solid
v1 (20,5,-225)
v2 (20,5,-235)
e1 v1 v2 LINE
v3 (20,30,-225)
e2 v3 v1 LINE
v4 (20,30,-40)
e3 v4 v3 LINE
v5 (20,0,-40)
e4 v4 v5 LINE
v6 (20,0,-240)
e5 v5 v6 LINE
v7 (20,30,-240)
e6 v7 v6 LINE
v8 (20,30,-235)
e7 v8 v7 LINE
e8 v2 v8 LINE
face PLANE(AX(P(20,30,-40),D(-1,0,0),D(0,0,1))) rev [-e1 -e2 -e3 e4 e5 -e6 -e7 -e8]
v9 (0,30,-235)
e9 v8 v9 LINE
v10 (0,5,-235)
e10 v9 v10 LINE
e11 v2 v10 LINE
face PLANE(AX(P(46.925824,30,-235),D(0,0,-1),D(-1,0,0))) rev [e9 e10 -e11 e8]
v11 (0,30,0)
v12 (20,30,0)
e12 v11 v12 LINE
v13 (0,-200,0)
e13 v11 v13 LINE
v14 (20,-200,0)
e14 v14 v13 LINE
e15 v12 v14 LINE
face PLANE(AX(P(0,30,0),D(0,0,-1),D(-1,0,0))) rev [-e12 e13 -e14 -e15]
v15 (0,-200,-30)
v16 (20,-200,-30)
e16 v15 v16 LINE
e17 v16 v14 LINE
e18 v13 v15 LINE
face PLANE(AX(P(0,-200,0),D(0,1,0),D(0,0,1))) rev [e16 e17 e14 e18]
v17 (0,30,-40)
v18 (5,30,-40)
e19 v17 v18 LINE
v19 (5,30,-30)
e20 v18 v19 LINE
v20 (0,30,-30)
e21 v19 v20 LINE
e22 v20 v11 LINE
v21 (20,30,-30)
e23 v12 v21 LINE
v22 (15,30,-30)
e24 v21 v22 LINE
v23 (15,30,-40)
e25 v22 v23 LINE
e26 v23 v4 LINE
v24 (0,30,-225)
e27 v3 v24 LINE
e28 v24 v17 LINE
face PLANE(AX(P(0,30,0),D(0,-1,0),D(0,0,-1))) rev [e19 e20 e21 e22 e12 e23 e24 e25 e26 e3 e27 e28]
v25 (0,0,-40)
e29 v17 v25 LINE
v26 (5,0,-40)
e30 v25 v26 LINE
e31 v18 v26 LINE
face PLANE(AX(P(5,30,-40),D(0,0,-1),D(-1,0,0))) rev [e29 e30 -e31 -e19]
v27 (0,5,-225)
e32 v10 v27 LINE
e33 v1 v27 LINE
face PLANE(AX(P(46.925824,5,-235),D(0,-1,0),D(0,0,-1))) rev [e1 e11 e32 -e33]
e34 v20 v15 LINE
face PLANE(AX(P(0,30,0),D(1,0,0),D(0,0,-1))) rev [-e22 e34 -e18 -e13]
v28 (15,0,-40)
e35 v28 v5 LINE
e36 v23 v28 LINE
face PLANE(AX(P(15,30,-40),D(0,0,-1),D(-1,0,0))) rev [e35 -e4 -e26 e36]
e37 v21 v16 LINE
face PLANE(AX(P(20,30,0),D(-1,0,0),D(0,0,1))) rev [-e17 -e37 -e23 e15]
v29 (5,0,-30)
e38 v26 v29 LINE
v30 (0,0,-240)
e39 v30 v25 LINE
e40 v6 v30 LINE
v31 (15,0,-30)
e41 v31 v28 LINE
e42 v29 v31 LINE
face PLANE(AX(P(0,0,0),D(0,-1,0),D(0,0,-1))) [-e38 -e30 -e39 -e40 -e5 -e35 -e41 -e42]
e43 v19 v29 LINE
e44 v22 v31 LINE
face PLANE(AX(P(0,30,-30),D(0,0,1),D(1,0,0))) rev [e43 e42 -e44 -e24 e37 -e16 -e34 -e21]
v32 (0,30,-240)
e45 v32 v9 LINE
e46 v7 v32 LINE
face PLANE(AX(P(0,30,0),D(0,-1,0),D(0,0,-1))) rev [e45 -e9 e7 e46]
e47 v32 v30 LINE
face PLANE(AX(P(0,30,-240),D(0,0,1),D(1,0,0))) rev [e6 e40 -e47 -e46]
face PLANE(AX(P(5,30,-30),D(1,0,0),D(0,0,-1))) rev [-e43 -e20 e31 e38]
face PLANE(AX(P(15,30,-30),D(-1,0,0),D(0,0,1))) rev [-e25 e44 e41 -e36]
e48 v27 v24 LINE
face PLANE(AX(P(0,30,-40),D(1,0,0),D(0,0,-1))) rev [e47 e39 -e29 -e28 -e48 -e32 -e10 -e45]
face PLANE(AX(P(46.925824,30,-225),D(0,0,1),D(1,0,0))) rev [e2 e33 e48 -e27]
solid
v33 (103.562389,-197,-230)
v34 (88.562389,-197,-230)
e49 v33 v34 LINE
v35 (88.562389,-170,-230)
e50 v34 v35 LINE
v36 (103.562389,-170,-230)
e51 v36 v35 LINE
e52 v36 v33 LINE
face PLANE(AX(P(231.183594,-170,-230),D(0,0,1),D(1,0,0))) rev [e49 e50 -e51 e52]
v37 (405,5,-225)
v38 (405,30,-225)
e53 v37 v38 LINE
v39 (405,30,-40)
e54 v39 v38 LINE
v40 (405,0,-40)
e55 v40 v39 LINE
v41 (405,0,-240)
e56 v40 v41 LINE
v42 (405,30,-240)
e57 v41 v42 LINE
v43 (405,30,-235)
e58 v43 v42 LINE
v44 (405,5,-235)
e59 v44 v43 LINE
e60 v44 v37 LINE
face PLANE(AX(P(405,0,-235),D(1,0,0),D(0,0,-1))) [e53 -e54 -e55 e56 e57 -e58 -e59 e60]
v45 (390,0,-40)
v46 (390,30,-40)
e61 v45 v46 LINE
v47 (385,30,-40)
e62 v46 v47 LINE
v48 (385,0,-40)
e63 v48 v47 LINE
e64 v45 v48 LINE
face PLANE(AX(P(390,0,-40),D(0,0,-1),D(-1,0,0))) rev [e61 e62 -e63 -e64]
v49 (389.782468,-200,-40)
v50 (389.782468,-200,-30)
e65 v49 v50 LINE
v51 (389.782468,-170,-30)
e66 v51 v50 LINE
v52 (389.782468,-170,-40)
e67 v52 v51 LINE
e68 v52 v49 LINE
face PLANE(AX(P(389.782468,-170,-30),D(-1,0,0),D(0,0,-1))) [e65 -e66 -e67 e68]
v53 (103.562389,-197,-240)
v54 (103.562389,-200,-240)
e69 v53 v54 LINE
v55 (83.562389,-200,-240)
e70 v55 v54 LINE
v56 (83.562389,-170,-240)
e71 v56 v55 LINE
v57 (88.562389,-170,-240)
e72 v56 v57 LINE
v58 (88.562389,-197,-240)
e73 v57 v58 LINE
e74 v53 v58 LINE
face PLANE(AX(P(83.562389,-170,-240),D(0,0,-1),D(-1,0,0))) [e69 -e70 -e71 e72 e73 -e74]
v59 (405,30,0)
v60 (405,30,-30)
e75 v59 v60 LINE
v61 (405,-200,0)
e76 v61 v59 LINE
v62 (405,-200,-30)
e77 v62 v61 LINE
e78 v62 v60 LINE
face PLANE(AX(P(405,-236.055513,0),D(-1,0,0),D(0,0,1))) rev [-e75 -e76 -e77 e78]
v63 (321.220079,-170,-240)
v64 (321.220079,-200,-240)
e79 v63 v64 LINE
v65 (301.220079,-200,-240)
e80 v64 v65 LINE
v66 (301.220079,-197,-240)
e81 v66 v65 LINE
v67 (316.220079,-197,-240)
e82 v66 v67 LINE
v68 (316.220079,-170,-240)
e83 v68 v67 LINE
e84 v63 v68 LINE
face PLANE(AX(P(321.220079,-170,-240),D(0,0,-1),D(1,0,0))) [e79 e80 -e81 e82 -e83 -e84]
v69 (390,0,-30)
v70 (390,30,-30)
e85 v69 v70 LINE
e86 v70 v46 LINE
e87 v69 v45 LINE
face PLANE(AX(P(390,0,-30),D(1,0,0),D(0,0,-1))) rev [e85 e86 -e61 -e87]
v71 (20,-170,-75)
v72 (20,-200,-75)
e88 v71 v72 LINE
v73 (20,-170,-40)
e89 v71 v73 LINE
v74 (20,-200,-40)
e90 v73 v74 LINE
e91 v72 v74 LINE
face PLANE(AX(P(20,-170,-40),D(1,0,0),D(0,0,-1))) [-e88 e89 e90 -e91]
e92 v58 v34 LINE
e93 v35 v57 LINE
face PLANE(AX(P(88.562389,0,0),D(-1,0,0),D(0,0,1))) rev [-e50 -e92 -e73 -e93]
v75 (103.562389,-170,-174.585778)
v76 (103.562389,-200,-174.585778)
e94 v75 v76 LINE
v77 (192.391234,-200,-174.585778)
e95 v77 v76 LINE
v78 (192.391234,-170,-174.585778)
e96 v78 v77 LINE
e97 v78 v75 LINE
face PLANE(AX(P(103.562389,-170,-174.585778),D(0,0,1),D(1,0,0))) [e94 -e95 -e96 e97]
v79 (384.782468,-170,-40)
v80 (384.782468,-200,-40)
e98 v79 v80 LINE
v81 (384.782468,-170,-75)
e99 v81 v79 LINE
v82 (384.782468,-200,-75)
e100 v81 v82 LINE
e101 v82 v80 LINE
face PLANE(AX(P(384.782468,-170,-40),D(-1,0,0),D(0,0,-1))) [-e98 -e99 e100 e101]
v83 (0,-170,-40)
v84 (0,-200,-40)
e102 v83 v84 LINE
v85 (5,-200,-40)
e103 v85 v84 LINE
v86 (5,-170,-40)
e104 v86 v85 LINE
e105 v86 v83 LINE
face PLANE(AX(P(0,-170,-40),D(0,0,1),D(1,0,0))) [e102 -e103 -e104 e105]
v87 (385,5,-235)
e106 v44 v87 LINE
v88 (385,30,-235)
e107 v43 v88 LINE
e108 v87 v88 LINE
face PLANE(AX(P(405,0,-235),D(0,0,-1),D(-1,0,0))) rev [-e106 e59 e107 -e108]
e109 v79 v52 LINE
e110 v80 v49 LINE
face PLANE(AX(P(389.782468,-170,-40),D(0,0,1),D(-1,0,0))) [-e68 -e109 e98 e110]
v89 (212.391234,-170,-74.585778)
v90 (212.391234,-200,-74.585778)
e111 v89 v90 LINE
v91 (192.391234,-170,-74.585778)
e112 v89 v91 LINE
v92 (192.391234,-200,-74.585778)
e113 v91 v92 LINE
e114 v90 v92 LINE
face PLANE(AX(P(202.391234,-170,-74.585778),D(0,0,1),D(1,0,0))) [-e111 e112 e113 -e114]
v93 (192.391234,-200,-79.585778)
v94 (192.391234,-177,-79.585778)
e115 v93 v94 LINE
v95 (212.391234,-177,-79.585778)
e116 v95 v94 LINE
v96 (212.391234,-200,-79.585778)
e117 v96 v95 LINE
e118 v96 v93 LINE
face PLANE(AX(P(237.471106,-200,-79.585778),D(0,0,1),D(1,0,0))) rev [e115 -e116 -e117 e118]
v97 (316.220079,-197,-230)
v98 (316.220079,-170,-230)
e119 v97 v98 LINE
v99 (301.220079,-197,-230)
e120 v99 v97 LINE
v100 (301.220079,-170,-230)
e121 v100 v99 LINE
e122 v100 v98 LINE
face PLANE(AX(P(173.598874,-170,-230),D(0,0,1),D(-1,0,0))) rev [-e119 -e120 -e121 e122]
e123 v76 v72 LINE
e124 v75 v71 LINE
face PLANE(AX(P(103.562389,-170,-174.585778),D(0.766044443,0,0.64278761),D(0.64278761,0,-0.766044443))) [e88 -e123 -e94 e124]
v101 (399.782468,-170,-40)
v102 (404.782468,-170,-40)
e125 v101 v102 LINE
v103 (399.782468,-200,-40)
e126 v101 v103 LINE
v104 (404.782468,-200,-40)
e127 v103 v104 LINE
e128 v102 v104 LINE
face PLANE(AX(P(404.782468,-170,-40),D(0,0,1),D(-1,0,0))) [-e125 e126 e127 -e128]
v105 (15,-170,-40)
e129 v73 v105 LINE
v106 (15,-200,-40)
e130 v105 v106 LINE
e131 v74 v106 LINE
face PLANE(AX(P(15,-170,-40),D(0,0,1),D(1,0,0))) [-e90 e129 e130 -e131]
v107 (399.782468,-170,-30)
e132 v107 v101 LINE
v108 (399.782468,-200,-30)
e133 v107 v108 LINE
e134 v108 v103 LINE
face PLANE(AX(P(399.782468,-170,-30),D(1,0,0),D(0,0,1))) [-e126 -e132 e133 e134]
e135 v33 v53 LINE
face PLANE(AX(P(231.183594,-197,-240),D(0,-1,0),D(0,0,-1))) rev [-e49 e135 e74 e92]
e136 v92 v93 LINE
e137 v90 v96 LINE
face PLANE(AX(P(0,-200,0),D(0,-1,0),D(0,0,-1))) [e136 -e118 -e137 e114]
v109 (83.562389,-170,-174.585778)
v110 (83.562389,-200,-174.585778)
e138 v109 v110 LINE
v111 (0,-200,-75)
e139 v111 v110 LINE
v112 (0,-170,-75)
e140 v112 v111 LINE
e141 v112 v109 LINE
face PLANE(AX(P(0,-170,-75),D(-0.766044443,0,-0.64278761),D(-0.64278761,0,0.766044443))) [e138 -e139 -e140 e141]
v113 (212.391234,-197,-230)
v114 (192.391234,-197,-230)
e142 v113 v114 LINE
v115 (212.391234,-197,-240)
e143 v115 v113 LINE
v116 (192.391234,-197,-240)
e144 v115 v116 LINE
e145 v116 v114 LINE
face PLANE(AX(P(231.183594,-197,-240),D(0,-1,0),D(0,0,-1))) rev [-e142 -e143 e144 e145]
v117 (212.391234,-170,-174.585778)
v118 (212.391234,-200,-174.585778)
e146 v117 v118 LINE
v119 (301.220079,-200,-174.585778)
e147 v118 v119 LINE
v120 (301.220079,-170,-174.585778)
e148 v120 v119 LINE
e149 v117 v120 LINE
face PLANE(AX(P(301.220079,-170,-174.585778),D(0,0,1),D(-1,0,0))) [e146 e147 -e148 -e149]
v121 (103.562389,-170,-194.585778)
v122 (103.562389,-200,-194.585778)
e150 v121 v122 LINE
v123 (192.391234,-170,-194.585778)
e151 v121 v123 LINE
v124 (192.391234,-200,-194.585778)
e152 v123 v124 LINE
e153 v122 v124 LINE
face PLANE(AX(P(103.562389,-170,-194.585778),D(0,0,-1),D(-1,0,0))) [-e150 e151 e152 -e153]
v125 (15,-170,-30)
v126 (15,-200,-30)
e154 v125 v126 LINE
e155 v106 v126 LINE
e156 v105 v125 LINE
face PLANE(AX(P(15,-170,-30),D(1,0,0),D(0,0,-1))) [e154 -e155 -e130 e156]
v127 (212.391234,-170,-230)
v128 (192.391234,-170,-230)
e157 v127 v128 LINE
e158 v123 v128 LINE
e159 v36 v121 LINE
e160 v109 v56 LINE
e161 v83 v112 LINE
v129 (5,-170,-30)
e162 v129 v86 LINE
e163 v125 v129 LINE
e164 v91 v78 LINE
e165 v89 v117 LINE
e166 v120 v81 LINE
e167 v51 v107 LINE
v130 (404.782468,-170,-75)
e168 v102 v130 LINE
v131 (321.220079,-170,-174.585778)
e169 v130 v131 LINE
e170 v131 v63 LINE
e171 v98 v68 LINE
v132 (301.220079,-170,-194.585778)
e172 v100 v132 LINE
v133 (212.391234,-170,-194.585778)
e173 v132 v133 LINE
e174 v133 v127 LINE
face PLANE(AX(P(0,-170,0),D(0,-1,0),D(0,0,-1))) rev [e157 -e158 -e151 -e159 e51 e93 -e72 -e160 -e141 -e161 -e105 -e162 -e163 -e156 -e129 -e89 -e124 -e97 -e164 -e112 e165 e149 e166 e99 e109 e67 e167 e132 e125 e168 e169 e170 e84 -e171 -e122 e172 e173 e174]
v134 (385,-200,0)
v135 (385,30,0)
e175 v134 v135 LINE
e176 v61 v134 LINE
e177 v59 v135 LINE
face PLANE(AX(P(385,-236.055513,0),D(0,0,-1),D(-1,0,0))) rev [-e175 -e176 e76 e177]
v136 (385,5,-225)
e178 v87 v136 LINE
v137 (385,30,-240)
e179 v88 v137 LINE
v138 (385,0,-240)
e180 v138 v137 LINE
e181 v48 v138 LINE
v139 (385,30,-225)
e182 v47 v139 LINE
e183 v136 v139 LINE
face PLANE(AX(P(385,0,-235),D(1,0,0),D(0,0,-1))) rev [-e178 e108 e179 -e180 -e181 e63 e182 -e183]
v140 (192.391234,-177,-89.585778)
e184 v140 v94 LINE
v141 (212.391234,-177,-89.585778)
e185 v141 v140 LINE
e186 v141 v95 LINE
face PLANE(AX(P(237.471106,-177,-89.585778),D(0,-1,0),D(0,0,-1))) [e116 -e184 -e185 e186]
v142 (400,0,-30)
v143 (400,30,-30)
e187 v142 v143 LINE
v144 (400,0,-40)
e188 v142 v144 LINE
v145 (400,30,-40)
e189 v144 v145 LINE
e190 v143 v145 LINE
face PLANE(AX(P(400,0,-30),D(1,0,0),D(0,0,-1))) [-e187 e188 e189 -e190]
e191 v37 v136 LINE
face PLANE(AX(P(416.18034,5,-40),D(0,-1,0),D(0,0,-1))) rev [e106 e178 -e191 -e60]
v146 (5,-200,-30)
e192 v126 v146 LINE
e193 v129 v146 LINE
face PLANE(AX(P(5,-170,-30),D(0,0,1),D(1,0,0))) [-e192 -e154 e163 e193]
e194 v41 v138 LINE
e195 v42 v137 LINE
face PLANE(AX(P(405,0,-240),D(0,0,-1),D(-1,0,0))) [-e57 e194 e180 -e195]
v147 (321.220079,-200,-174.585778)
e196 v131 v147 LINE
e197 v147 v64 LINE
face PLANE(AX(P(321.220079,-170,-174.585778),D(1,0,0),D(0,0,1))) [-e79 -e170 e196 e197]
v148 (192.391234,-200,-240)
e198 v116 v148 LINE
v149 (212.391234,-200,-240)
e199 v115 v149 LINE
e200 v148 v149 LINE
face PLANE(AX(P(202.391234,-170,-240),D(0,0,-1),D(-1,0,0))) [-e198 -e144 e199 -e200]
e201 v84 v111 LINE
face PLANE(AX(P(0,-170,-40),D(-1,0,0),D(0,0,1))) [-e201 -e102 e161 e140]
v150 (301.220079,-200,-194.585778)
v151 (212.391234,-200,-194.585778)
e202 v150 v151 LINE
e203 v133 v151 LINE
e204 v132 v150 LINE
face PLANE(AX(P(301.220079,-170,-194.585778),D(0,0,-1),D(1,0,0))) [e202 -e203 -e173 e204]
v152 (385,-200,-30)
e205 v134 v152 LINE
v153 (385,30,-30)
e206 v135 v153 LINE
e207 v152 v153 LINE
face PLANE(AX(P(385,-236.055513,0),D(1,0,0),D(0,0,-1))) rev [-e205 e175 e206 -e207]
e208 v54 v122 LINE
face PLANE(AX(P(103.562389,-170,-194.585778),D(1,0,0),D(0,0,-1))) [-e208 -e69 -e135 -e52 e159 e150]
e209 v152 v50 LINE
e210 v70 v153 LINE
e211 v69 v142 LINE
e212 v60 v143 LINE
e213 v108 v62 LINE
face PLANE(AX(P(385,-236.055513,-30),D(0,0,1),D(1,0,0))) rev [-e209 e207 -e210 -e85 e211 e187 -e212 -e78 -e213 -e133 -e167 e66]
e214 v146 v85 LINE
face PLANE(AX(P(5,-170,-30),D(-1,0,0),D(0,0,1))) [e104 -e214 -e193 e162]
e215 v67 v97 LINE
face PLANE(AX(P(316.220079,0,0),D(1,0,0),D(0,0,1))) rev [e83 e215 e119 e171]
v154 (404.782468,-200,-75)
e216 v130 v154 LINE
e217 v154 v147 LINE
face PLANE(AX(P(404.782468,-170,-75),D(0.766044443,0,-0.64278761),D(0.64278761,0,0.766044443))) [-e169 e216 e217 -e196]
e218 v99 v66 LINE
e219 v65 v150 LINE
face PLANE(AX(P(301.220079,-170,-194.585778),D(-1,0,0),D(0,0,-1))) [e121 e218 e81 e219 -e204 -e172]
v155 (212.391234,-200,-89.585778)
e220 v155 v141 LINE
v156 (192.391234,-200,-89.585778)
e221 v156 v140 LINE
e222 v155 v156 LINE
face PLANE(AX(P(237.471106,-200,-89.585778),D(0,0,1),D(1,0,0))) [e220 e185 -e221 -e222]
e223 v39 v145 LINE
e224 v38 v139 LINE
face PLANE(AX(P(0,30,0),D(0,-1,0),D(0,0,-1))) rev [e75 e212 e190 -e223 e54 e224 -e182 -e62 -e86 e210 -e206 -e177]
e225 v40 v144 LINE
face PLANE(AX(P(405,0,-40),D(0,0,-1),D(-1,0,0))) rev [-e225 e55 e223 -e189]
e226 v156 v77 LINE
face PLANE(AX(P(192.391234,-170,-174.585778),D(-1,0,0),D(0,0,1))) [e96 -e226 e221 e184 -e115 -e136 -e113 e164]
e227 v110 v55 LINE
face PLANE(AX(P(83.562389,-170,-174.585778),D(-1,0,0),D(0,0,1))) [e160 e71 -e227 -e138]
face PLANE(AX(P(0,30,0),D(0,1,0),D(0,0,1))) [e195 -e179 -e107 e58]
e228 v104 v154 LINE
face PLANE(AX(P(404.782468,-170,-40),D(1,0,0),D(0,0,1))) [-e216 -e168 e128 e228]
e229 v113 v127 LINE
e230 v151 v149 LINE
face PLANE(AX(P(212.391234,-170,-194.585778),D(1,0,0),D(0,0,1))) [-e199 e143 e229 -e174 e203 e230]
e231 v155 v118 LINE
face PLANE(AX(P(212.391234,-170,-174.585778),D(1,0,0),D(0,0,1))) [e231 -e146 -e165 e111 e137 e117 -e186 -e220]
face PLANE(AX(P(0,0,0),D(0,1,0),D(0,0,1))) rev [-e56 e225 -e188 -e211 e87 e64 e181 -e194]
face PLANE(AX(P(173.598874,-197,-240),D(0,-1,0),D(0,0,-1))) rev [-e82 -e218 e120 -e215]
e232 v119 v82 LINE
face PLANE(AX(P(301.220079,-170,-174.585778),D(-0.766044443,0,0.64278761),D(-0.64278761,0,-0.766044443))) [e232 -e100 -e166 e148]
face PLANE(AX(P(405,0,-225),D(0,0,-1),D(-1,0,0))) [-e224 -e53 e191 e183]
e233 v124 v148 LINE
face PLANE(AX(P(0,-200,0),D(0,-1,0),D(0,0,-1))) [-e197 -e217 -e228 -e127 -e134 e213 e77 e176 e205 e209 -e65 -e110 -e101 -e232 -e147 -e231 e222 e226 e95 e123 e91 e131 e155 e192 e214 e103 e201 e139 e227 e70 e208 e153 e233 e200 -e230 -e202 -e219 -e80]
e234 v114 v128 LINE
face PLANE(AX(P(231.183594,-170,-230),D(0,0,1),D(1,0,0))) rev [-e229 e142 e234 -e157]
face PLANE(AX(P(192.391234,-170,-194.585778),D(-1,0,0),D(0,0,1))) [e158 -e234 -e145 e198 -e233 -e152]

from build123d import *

# Parameters (mm, degrees)
BOSS_EXTRUDE1_DEPTH   = 30
SKETCH2_W             = 10
SKETCH2_H             = 25
CUT_EXTRUDE1_DEPTH    = 20
SKETCH4_W             = 20
SKETCH4_H             = 30
BOSS_EXTRUDE2_DEPTH   = 200
BOSS_EXTRUDE3_DEPTH   = 30
CUT_EXTRUDE2_REACH    = 341.246
CUT_EXTRUDE2_START    = -5
SKETCH7_W             = 10
SKETCH7_H             = 27
MIRROR2_START         = -200
MIRROR2_DEPTH         = 30
MIRROR2_2_OUTLINE_W   = 10
MIRROR2_2_OUTLINE_H   = 10
MIRROR2_2_OUTLINE_W_2 = 15
MIRROR2_2_DEPTH       = 3
SKETCH8_W             = 20
SKETCH8_H             = 5
BOSS_EXTRUDE4_DEPTH   = 30
BOSS_EXTRUDE4_2_DEPTH = 30
SKETCH9_W             = 20
SKETCH9_H             = 30
BOSS_EXTRUDE5_DEPTH   = 200
BOSS_EXTRUDE6_START   = 365
SKETCH10_W            = 10
SKETCH10_H            = 5
BOSS_EXTRUDE6_DEPTH   = 20
SKETCH11_W            = 10
SKETCH11_H            = 23
CUT_EXTRUDE3_DEPTH    = 20


# Read off the part's stored shape, not the designer's step: Mirror2
with BuildPart() as part:
    # Sketch1 → Boss-Extrude1 (new body)
    with BuildSketch(Plane(origin=(0, 0, 0), x_dir=(1, 0, 0), z_dir=(0, 1, 0))):
        Polygon((15, 30), (20, 30), (20, 0), (0, 0), (0, 30), (5, 30), (5, 40), (0, 40), (0, 240), (20, 240), (20, 40), (15, 40), align=None)
    extrude(amount=BOSS_EXTRUDE1_DEPTH)

    # Sketch2 → Cut-Extrude1 (cut)
    with BuildSketch(Plane.ZY):
        with Locations((-230, 17.5)):
            Rectangle(SKETCH2_W, SKETCH2_H)
    extrude(amount=-CUT_EXTRUDE1_DEPTH, mode=Mode.SUBTRACT)

    # Sketch4 → Boss-Extrude2 (add)
    with BuildSketch(Plane.XZ):
        with Locations((10, -15)):
            Rectangle(SKETCH4_W, SKETCH4_H)
    extrude(amount=BOSS_EXTRUDE2_DEPTH)


with BuildPart() as body_2:
    # Sketch5 → Boss-Extrude3 (new body)
    with BuildSketch(Plane.XZ.offset(200)):
        Polygon((5, -30), (15, -30), (15, -40), (20, -40), (20, -75), (103.562389259, -174.585777605), (192.391233937, -174.585777605), (192.391233937, -74.585777605), (202.391233937, -74.585777605), (202.391233937, -240), (192.391233937, -240), (192.391233937, -194.585777605), (103.562389259, -194.585777605), (103.562389259, -240), (83.562389259, -240), (83.562389259, -174.585777605), (0, -75), (0, -40), (5, -40), align=None)
    extrude(amount=-BOSS_EXTRUDE3_DEPTH)

    # Cut-Extrude2: up to this face of the body (flat: up to its plane)
    cut_extrude2_end = Plane(body_2.part.faces().sort_by_distance((202.391233937, -185, -157.292888803))[0])
    # Sketch7 → Cut-Extrude2 (cut, up to the picked face)
    with BuildSketch(Plane.ZY.offset(-83.562389259).offset(CUT_EXTRUDE2_START), mode=Mode.PRIVATE) as cut_extrude2_sk1:
        with Locations((-235, -183.5)):
            Rectangle(SKETCH7_W, SKETCH7_H)
    cut_extrude2_tool1 = split(extrude(cut_extrude2_sk1.sketch, amount=-CUT_EXTRUDE2_REACH, mode=Mode.PRIVATE), bisect_by=cut_extrude2_end, keep=Keep.BOTH, mode=Mode.PRIVATE)
    add(cut_extrude2_tool1.solids().sort_by(Axis((88.562389, -183.5, -235), (1, 0, 0)))[0], mode=Mode.SUBTRACT)

    # Mirror2 outline → Mirror2 (add)
    with BuildSketch(Plane(origin=(0, 0, 0), x_dir=(1, 0, 0), z_dir=(0, 1, 0)).offset(MIRROR2_START)):
        Polygon((384.782467874, 75), (384.782467874, 40), (389.782467874, 40), (389.782467874, 30), (399.782467874, 30), (399.782467874, 40), (404.782467874, 40), (404.782467874, 75), (321.220078615, 174.585777605), (321.220078615, 240), (316.220078615, 240), (316.220078615, 230), (301.220078615, 230), (301.220078615, 194.585777605), (212.391233937, 194.585777605), (212.391233937, 230), (202.391233937, 230), (202.391233937, 74.585777605), (212.391233937, 74.585777605), (212.391233937, 174.585777605), (301.220078615, 174.585777605), align=None)
    extrude(amount=MIRROR2_DEPTH)

    # Mirror2 2 outline → Mirror2 2 (add)
    with BuildSketch(Plane(origin=(0, 0, 0), x_dir=(1, 0, 0), z_dir=(0, 1, 0)).offset(MIRROR2_START)):
        with Locations((207.391233937, 235)):
            Rectangle(MIRROR2_2_OUTLINE_W, MIRROR2_2_OUTLINE_H)
        with Locations((308.720078615, 235)):
            Rectangle(MIRROR2_2_OUTLINE_W_2, MIRROR2_2_OUTLINE_H)
    extrude(amount=MIRROR2_2_DEPTH)



with BuildPart() as body_3:
    # Sketch8 → Boss-Extrude4 (new body)
    with BuildSketch(Plane(origin=(0, 30, 0), x_dir=(1, 0, 0), z_dir=(0, 1, 0))):
        with Locations((395, 237.5)):
            Rectangle(SKETCH8_W, SKETCH8_H)
    extrude(amount=-BOSS_EXTRUDE4_DEPTH)


with BuildPart() as body_4:
    # Sketch8 → Boss-Extrude4 2 (new body)
    with BuildSketch(Plane(origin=(0, 30, 0), x_dir=(1, 0, 0), z_dir=(0, 1, 0))):
        Polygon((405, 30), (400, 30), (400, 40), (405, 40), (405, 225), (385, 225), (385, 40), (390, 40), (390, 30), (385, 30), (385, 0), (405, 0), align=None)
    extrude(amount=-BOSS_EXTRUDE4_2_DEPTH)


with BuildPart() as body_2_1:
    add(body_2.part)

    add(body_4.part)  # Boss-Extrude5 merges body 4
    # Sketch9 → Boss-Extrude5 (add)
    with BuildSketch(Plane.XZ):
        with Locations((395, -15)):
            Rectangle(SKETCH9_W, SKETCH9_H)
    extrude(amount=BOSS_EXTRUDE5_DEPTH)


    add(body_3.part)  # Boss-Extrude6 merges body 3
    # Sketch10 → Boss-Extrude6 (add)
    with BuildSketch(Plane(origin=(20, 0, 0), x_dir=(0, 0, -1), z_dir=(1, 0, 0)).offset(BOSS_EXTRUDE6_START)):
        with Locations((230, 2.5)):
            Rectangle(SKETCH10_W, SKETCH10_H)
    extrude(amount=BOSS_EXTRUDE6_DEPTH)

    # Sketch11 → Cut-Extrude3 (cut)
    with BuildSketch(Plane.ZY.offset(-192.391233937)):
        with Locations((-84.585777605, -188.5)):
            Rectangle(SKETCH11_W, SKETCH11_H)
    extrude(amount=-CUT_EXTRUDE3_DEPTH, mode=Mode.SUBTRACT)


solid = Compound([part.part, body_2_1.part])
